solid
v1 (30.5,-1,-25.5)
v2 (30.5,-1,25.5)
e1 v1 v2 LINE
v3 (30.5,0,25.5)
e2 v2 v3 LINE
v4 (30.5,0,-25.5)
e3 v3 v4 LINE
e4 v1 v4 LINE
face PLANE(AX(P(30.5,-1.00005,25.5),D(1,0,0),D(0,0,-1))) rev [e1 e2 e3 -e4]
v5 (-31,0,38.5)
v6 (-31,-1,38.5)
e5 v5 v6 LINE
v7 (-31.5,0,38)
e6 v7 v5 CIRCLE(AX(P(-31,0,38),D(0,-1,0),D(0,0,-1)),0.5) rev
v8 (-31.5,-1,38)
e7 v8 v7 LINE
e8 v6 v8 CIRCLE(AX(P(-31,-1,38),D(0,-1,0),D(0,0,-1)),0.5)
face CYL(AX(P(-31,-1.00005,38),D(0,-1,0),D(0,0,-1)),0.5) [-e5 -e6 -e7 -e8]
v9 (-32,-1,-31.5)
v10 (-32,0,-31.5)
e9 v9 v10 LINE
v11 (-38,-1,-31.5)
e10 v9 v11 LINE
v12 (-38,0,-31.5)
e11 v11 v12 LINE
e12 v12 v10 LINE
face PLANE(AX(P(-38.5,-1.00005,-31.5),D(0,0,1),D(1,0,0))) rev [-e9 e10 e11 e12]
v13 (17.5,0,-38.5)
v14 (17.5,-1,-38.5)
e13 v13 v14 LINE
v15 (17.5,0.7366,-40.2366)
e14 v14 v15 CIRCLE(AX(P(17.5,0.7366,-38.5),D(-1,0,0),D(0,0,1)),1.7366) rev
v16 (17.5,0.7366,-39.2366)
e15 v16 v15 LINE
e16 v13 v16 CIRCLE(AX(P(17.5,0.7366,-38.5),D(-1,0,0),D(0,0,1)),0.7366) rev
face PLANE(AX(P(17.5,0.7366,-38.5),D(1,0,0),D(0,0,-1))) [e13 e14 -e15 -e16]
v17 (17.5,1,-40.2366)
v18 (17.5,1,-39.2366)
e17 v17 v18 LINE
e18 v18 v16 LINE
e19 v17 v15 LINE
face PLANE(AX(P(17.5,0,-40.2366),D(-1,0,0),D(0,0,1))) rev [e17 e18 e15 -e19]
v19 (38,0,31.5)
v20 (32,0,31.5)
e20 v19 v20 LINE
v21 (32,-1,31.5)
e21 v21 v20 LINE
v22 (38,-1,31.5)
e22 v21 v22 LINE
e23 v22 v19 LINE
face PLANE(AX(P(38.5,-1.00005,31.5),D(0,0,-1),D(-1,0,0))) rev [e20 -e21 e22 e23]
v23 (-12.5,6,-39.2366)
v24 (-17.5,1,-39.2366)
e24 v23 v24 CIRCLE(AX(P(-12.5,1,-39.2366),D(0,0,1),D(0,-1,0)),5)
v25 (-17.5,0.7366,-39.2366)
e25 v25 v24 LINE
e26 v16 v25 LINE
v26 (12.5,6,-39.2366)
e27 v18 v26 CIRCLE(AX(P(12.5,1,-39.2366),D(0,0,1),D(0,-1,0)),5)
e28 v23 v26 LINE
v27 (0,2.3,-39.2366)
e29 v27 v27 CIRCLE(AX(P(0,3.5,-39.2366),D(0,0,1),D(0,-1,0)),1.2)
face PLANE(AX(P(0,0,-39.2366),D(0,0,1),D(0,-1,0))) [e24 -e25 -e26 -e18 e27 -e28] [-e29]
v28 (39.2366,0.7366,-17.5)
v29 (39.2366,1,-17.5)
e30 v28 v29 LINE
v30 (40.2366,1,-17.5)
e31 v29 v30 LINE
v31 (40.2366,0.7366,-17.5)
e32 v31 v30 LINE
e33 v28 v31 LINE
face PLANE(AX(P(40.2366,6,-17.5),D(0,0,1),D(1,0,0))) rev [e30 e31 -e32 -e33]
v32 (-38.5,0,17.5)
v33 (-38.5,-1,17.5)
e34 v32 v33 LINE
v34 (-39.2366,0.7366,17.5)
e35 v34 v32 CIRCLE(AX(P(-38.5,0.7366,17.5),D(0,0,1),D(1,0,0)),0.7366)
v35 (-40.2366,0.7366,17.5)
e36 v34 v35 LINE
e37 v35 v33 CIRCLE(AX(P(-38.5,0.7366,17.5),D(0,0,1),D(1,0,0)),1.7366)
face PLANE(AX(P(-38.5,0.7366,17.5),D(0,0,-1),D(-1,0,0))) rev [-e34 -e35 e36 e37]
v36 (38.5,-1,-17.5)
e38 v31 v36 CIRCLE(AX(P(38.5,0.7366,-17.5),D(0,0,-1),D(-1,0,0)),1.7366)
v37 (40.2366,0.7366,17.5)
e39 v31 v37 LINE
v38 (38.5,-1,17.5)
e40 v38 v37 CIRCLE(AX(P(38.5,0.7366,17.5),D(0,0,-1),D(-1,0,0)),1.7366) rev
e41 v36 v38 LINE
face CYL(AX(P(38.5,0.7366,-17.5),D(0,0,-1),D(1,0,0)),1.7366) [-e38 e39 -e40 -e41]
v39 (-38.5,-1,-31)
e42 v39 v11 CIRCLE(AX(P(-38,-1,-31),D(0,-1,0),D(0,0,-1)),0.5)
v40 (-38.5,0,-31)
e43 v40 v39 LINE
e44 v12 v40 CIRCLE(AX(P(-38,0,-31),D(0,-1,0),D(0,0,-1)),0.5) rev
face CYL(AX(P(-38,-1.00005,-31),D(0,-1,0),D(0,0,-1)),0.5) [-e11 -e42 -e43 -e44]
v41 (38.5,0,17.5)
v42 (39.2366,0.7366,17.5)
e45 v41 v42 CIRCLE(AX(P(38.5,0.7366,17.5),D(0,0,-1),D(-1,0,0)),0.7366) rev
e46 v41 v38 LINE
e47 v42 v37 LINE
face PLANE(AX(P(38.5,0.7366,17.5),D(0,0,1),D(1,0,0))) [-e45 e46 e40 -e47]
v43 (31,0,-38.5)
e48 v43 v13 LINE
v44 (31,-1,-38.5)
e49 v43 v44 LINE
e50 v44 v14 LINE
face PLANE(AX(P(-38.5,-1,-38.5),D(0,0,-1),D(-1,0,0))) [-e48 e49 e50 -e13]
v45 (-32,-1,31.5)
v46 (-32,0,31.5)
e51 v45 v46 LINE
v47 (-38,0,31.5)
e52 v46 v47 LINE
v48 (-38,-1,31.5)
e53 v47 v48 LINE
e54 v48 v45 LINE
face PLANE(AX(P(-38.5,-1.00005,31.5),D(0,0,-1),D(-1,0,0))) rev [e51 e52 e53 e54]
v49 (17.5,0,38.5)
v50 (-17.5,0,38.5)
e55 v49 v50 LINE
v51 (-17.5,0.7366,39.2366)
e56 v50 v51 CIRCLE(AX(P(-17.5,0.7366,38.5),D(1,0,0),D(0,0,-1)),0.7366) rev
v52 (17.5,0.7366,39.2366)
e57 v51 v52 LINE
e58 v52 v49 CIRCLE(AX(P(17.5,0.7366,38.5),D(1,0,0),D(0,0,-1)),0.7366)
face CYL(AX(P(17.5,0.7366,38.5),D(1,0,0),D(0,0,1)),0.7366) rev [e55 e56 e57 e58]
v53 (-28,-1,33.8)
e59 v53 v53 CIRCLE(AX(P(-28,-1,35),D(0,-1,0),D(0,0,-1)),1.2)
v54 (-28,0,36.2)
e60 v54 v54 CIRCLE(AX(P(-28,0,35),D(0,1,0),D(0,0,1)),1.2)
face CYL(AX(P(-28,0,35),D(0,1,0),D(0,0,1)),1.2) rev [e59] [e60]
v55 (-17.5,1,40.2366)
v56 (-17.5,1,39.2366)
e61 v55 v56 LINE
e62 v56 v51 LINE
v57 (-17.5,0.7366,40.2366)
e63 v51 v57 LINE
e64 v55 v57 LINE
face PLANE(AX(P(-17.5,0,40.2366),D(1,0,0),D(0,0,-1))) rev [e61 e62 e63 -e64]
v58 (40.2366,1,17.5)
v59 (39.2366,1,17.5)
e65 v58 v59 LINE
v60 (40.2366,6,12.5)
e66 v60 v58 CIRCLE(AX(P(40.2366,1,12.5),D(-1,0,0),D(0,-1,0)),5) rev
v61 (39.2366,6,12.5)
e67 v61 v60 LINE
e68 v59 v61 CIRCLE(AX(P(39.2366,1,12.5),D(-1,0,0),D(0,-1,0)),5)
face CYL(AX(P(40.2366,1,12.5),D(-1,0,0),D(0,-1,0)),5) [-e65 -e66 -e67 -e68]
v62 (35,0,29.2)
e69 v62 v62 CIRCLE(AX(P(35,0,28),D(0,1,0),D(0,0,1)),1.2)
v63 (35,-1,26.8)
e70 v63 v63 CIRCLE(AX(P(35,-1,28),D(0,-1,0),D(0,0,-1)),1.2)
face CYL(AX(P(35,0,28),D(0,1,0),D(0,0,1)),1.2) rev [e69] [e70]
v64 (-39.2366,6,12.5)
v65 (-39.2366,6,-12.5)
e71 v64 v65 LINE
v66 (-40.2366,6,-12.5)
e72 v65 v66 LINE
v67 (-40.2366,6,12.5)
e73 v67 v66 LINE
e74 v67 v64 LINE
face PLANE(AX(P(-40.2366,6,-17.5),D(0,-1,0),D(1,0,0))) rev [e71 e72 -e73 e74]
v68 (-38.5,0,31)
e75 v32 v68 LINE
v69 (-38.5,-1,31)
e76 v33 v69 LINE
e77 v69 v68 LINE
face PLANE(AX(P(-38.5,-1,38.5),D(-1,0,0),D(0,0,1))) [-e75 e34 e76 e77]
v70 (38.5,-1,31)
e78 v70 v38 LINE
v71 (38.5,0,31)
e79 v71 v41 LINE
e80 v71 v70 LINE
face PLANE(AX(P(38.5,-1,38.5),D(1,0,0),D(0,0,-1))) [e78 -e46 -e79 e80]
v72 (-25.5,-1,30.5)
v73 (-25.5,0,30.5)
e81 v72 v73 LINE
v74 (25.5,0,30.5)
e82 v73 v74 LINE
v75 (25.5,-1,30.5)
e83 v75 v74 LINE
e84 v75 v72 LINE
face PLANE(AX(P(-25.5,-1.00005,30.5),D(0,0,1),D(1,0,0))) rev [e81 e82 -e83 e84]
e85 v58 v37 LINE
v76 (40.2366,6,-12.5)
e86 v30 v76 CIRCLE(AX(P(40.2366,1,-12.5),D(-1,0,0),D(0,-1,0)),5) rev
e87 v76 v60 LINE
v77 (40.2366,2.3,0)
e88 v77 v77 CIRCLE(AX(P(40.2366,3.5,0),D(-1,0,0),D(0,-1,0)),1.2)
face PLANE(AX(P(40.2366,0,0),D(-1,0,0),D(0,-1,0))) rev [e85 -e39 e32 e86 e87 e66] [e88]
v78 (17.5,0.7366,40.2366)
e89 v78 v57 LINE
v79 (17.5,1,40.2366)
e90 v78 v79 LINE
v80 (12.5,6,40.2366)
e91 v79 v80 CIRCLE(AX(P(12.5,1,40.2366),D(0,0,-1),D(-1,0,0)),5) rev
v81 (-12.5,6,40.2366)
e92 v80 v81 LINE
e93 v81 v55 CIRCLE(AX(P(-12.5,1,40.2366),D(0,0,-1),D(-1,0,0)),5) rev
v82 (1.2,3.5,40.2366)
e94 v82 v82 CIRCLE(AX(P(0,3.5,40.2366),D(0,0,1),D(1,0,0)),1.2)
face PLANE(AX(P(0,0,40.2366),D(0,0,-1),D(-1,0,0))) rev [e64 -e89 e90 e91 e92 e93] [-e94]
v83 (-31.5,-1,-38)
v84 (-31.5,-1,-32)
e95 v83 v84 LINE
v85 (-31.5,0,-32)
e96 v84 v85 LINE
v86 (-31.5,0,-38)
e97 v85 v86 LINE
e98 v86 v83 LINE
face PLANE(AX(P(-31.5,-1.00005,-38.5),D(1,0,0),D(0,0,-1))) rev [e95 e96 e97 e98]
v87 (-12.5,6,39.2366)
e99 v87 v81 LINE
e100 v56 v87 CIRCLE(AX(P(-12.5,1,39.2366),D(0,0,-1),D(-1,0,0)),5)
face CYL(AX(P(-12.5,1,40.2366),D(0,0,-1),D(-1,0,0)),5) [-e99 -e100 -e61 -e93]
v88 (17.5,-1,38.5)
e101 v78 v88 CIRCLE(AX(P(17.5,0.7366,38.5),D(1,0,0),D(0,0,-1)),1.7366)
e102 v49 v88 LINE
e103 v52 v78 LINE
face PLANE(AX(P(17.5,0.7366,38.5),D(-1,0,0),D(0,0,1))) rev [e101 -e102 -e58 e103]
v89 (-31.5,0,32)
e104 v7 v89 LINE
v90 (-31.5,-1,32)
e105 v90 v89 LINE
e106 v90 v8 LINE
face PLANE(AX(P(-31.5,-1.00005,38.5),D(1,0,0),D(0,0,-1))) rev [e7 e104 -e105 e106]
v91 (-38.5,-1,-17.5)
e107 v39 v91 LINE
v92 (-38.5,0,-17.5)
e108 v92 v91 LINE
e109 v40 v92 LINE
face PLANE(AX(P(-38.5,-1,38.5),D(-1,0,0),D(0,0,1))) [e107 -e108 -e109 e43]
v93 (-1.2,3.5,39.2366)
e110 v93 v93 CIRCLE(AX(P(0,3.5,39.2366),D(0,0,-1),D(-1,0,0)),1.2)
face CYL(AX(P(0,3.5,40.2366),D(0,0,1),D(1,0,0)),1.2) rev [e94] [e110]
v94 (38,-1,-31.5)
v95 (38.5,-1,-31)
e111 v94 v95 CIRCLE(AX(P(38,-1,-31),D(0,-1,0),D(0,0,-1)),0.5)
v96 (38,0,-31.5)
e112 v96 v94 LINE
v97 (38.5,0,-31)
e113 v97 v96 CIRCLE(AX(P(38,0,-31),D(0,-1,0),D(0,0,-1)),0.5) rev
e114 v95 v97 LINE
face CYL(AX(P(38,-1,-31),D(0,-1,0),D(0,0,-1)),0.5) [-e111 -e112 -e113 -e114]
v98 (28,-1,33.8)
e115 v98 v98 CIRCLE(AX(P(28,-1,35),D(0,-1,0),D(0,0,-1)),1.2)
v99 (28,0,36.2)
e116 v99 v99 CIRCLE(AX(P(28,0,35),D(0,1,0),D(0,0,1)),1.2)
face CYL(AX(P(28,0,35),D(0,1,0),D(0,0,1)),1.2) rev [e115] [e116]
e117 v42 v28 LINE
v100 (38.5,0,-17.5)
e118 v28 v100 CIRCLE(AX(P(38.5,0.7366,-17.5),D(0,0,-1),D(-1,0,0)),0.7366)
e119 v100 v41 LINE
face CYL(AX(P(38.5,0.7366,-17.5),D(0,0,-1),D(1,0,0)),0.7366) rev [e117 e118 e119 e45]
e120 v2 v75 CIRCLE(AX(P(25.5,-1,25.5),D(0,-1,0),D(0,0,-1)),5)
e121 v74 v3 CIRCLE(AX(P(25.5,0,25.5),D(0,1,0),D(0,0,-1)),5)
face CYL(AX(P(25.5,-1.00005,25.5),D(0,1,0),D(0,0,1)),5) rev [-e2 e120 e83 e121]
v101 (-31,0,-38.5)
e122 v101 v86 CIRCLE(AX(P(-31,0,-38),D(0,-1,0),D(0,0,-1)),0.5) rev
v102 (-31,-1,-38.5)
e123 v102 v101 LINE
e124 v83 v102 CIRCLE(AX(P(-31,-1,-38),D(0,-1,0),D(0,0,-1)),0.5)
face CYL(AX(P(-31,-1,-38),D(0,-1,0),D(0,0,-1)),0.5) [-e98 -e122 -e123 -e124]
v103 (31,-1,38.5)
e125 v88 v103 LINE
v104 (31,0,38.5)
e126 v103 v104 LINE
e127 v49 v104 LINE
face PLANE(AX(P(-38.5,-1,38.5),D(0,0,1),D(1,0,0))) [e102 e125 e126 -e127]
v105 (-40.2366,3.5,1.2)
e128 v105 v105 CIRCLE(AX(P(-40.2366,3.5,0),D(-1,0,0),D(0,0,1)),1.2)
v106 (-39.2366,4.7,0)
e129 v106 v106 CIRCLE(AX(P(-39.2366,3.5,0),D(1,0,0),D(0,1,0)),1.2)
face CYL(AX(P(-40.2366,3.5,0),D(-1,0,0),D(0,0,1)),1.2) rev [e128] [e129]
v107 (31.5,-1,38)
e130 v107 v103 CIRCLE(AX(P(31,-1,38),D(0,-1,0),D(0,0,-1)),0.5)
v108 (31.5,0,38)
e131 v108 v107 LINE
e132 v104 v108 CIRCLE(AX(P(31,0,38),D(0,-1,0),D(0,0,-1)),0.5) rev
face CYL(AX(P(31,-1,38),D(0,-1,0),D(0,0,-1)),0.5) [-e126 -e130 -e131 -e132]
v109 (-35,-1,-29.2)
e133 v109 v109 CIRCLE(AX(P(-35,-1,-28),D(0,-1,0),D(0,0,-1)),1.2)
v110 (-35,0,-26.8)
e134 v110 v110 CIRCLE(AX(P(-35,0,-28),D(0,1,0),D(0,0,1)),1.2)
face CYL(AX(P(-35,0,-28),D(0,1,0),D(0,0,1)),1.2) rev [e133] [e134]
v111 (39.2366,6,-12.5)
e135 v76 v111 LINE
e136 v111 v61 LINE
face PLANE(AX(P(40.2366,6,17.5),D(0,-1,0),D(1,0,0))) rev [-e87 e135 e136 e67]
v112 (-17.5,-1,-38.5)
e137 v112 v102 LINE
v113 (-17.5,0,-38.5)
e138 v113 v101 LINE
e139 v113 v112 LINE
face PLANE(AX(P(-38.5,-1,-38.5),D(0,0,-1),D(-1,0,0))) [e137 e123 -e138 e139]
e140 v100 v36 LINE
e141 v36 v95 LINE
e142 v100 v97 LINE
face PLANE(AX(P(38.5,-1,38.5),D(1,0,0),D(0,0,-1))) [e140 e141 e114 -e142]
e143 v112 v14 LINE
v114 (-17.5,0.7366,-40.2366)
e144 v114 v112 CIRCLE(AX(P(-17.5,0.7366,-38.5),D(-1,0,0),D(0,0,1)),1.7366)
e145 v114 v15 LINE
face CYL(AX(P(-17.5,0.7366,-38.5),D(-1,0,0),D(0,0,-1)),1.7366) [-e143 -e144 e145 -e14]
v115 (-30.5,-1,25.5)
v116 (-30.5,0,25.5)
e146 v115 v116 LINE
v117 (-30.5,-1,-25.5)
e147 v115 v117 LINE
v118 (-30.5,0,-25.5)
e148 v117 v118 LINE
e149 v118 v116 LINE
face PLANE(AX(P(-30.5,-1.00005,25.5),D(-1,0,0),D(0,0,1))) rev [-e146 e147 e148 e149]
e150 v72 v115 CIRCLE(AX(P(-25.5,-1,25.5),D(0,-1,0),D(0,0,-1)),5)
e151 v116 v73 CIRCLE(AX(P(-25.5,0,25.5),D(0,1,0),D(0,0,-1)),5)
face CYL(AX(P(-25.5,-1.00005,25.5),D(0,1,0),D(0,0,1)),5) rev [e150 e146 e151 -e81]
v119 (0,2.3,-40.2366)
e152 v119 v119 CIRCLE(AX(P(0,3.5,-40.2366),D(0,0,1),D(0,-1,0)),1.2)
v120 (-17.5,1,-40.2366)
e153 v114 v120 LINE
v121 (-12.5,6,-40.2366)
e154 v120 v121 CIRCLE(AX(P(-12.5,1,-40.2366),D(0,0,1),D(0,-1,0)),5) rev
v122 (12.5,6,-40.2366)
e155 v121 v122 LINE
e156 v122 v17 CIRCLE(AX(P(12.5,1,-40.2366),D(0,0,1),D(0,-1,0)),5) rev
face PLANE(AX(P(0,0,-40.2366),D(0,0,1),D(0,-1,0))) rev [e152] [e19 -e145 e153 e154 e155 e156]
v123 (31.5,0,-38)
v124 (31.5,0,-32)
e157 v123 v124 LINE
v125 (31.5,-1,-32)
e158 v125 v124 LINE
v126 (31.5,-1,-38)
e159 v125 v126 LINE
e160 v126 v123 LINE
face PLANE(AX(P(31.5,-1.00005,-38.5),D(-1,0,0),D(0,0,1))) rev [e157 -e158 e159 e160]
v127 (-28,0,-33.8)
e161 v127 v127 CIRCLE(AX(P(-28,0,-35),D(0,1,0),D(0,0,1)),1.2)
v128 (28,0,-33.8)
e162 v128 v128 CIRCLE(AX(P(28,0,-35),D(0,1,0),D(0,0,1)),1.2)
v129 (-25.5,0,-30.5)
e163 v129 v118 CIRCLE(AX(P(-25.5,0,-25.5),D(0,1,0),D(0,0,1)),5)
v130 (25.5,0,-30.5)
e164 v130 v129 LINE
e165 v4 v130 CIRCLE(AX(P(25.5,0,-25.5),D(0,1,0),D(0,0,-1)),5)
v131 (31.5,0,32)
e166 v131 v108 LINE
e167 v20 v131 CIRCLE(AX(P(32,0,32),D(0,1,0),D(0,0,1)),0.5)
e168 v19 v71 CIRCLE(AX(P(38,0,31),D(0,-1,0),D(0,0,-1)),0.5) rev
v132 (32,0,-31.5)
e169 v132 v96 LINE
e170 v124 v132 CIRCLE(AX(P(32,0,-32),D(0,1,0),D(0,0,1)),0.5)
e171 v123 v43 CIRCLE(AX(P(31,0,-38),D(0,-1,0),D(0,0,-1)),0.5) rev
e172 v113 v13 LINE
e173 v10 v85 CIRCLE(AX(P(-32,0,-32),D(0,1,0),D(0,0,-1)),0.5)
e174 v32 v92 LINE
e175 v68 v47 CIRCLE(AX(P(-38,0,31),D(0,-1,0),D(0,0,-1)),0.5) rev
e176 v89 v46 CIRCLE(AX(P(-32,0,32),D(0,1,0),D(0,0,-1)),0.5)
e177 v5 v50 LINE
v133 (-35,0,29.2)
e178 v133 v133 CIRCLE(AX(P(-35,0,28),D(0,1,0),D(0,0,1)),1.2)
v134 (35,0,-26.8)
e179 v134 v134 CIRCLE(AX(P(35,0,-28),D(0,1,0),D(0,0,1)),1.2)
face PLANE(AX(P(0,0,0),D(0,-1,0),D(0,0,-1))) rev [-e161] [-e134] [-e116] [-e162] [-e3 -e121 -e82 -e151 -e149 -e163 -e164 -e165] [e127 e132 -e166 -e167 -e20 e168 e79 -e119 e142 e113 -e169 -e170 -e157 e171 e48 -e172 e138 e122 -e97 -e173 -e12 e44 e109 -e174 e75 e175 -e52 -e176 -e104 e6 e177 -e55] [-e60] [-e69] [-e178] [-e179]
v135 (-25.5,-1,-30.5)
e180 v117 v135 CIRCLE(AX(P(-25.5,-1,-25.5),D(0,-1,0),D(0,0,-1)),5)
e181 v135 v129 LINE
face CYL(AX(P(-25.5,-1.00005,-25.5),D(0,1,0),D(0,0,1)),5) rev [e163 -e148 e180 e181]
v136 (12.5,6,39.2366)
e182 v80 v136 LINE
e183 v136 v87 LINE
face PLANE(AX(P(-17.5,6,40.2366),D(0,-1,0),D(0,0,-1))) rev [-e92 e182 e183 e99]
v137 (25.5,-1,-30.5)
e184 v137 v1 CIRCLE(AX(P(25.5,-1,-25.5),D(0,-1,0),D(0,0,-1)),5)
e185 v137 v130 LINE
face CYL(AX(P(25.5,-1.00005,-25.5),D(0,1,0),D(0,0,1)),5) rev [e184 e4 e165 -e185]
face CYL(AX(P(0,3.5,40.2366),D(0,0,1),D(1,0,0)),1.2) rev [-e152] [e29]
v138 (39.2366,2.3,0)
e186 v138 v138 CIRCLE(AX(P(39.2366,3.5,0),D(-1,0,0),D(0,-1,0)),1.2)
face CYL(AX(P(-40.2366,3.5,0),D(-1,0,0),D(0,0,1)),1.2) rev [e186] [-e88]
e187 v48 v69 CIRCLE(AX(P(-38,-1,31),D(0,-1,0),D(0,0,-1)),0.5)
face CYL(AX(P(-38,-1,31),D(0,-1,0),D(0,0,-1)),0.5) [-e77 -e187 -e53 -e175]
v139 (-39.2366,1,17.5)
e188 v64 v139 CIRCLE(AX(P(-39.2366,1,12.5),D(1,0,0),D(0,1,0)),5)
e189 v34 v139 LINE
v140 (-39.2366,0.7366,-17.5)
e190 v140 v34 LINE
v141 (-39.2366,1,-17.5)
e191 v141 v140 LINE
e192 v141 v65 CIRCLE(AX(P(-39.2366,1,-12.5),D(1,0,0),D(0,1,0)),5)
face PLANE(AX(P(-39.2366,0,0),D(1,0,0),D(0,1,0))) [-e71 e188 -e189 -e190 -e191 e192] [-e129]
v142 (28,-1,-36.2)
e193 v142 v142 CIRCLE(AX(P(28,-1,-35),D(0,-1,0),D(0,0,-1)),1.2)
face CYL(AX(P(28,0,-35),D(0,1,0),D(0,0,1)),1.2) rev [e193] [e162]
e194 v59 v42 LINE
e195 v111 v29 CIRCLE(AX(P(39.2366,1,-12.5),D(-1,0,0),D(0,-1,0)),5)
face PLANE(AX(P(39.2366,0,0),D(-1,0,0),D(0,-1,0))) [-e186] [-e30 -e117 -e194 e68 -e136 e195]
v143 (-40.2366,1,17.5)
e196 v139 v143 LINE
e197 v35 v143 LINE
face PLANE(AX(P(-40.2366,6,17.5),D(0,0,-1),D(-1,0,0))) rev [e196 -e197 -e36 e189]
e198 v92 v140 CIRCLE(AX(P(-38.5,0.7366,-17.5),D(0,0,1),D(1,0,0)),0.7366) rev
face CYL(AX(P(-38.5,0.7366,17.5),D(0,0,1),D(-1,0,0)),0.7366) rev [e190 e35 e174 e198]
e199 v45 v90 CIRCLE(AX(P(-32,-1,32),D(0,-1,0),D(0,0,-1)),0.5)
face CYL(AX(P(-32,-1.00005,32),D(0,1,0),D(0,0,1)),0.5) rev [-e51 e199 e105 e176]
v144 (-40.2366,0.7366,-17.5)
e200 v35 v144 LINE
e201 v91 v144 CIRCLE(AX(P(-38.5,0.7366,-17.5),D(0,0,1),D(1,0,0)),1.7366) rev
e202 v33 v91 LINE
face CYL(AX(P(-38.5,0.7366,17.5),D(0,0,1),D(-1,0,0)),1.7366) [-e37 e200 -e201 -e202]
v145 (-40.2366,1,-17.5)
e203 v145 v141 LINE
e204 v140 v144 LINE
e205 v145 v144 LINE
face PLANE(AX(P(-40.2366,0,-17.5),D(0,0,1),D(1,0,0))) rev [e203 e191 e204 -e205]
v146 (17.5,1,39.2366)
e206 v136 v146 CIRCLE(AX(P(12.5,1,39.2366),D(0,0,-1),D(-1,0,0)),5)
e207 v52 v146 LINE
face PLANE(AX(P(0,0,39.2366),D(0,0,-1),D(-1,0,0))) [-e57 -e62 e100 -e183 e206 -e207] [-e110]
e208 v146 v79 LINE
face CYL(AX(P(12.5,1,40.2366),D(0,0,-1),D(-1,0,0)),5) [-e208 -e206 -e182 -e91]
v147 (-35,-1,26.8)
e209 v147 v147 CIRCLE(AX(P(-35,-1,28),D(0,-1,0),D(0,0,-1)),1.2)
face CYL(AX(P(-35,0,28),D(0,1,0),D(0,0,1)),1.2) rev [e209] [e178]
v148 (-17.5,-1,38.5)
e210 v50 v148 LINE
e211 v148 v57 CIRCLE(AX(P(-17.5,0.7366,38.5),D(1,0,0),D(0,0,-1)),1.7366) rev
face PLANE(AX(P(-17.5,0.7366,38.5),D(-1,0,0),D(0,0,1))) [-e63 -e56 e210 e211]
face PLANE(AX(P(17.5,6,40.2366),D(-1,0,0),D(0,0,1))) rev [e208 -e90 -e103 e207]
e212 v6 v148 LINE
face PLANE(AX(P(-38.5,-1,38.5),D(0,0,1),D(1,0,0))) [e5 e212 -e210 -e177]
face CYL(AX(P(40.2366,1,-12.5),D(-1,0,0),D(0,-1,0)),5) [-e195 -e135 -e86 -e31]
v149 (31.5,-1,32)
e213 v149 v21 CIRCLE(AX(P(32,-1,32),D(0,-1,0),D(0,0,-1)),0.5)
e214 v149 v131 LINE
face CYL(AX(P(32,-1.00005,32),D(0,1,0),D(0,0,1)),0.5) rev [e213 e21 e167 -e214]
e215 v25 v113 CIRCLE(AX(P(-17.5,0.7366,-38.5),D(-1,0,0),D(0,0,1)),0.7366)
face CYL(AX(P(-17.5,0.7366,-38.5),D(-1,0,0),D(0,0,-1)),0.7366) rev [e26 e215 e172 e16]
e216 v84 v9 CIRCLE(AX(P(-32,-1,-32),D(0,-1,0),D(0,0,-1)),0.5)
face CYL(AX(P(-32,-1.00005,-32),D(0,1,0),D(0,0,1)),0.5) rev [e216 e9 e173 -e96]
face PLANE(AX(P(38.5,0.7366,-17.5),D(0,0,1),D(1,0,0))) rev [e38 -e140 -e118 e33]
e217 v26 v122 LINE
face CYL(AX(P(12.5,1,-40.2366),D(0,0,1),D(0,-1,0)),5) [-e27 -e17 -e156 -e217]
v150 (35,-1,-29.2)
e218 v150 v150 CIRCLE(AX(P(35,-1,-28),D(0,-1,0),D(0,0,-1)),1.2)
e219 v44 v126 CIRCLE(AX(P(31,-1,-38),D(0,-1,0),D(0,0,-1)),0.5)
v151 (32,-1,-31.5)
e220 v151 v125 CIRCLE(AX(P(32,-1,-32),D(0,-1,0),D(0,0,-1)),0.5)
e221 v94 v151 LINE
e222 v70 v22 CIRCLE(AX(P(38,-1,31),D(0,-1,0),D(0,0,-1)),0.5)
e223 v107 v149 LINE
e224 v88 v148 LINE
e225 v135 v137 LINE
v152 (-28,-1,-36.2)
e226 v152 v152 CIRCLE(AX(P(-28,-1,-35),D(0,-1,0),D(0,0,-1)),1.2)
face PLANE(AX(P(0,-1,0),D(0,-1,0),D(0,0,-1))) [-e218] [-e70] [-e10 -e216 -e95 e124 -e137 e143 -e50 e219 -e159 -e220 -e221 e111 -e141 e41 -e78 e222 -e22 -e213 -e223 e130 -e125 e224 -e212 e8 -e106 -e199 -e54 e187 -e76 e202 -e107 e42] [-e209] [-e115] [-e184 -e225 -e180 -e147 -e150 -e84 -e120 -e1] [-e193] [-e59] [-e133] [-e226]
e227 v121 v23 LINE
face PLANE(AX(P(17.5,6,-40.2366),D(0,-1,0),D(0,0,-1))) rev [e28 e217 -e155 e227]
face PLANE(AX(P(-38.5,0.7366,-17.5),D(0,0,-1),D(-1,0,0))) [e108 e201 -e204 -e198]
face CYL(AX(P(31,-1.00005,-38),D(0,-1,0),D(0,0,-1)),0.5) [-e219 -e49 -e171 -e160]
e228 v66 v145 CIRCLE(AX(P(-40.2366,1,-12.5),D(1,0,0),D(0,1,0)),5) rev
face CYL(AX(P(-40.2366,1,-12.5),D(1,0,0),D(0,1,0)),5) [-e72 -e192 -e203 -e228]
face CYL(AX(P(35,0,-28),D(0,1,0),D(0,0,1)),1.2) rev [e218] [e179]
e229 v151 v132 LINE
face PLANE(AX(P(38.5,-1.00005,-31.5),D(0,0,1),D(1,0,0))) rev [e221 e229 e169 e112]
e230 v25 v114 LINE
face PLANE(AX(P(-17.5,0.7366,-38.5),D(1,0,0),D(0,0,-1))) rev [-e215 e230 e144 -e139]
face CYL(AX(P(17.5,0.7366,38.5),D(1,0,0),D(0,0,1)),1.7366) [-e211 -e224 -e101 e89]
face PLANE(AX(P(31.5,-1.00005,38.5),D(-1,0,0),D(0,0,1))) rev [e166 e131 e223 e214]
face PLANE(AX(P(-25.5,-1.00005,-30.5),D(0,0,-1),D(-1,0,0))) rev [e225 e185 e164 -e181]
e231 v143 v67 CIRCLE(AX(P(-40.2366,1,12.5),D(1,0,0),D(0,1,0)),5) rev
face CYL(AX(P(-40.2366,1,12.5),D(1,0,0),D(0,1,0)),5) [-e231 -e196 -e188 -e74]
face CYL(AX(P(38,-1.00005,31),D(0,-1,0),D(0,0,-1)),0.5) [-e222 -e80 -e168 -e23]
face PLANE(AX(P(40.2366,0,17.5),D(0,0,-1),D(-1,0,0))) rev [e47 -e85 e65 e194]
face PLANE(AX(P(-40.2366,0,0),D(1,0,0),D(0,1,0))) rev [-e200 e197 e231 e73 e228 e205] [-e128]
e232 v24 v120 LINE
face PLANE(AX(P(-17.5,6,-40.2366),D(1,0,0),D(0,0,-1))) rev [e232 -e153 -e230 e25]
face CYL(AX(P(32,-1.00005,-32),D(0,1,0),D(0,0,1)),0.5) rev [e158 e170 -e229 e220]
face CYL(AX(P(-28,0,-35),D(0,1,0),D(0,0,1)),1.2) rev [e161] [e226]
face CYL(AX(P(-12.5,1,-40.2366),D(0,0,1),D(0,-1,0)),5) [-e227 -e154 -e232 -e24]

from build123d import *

# Parameters (mm, degrees)
SKETCH1_W          = 77
SKETCH1_H          = 77
BASE_FLANGE1_DEPTH = 1
EDGE_FLANGE1_DEPTH = 35
EDGE_FLANGE2_DEPTH = 35
EDGE_FLANGE3_DEPTH = 35
EDGE_FLANGE4_DEPTH = 35
CUT_EXTRUDE1_DEPTH = 58.218598018
FILLET1_R          = 0.5
FILLET2_R          = 5
M2_HOLE1_AA_D      = 2.4
M2_HOLE2_AB_D      = 2.4
M2_HOLE3_AC_D      = 2.4


# Sheet-metal steps are written as plain solids
with BuildPart() as part:
    # Sketch1 → Base-Flange1 (new body)
    with BuildSketch(Plane(origin=(0, 0, 0), x_dir=(1, 0, 0), z_dir=(0, 1, 0))):
        Rectangle(SKETCH1_W, SKETCH1_H)
    extrude(amount=-BASE_FLANGE1_DEPTH)

    # Edge-Flange1 section (across the edge) → Edge-Flange1 (add)
    with BuildSketch(Plane(origin=(-17.5, 0, 39.2366), x_dir=(0, 0, -1), z_dir=(1, 0, 0))):
        with BuildLine():
            Line((-1, 0.7366), (-1, 6))
            Line((-1, 6), (0, 6))
            Line((0, 6), (0, 0.7366))
            ThreePointArc((0, 0.7366), (0.215745145, 0.215745145), (0.7366, 0))
            Line((0.7366, 0), (0.7366, -1))
            ThreePointArc((0.7366, -1), (-0.491361636, -0.491361636), (-1, 0.7366))
        make_face()
    extrude(amount=EDGE_FLANGE1_DEPTH)

    # Edge-Flange2 section (across the edge) → Edge-Flange2 (add)
    with BuildSketch(Plane(origin=(17.5, 0, -39.2366), x_dir=(0, 0, 1), z_dir=(-1, 0, 0))):
        with BuildLine():
            Line((-1, 0.7366), (-1, 6))
            Line((-1, 6), (0, 6))
            Line((0, 6), (0, 0.7366))
            ThreePointArc((0, 0.7366), (0.215745145, 0.215745145), (0.7366, 0))
            Line((0.7366, 0), (0.7366, -1))
            ThreePointArc((0.7366, -1), (-0.491361636, -0.491361636), (-1, 0.7366))
        make_face()
    extrude(amount=EDGE_FLANGE2_DEPTH)

    # Edge-Flange3 section (across the edge) → Edge-Flange3 (add)
    with BuildSketch(Plane(origin=(-39.2366, 0, -17.5), x_dir=(1, 0, 0), z_dir=(0, 0, 1))):
        with BuildLine():
            Line((-1, 0.7366), (-1, 6))
            Line((-1, 6), (0, 6))
            Line((0, 6), (0, 0.7366))
            ThreePointArc((0, 0.7366), (0.215745145, 0.215745145), (0.7366, 0))
            Line((0.7366, 0), (0.7366, -1))
            ThreePointArc((0.7366, -1), (-0.491361636, -0.491361636), (-1, 0.7366))
        make_face()
    extrude(amount=EDGE_FLANGE3_DEPTH)

    # Edge-Flange4 section (across the edge) → Edge-Flange4 (add)
    with BuildSketch(Plane(origin=(39.2366, 0, 17.5), x_dir=(-1, 0, 0), z_dir=(0, 0, -1))):
        with BuildLine():
            Line((-1, 0.7366), (-1, 6))
            Line((-1, 6), (0, 6))
            Line((0, 6), (0, 0.7366))
            ThreePointArc((0, 0.7366), (0.215745145, 0.215745145), (0.7366, 0))
            Line((0.7366, 0), (0.7366, -1))
            ThreePointArc((0.7366, -1), (-0.491361636, -0.491361636), (-1, 0.7366))
        make_face()
    extrude(amount=EDGE_FLANGE4_DEPTH)

    # Sketch18 → Cut-Extrude1 (cut, through all)
    with BuildSketch(Plane(origin=(0, 0, 0), x_dir=(1, 0, 0), z_dir=(0, 1, 0))):
        with BuildLine():
            Line((-25.5, -30.5), (25.5, -30.5))
            ThreePointArc((25.5, -30.5), (29.035533906, -29.035533906), (30.5, -25.5))
            Line((30.5, -25.5), (30.5, 25.5))
            ThreePointArc((30.5, 25.5), (29.035533906, 29.035533906), (25.5, 30.5))
            Line((25.5, 30.5), (-25.5, 30.5))
            ThreePointArc((-25.5, 30.5), (-29.035533906, 29.035533906), (-30.5, 25.5))
            Line((-30.5, 25.5), (-30.5, -25.5))
            ThreePointArc((-30.5, -25.5), (-29.035533906, -29.035533906), (-25.5, -30.5))
        make_face()
        with BuildLine():
            Line((-38.5, 38.5), (-31.5, 38.5))
            Line((-31.5, 38.5), (-31.5, 32))
            ThreePointArc((-31.5, 32), (-31.646446609, 31.646446609), (-32, 31.5))
            Line((-32, 31.5), (-38.5, 31.5))
            Line((-38.5, 31.5), (-38.5, 38.5))
        make_face()
        with BuildLine():
            Line((38.5, 38.5), (31.5, 38.5))
            Line((31.5, 38.5), (31.5, 32))
            ThreePointArc((31.5, 32), (31.646446609, 31.646446609), (32, 31.5))
            Line((32, 31.5), (38.5, 31.5))
            Line((38.5, 31.5), (38.5, 38.5))
        make_face()
        with BuildLine():
            Line((38.5, -38.5), (31.5, -38.5))
            Line((31.5, -38.5), (31.5, -32))
            ThreePointArc((31.5, -32), (31.646446609, -31.646446609), (32, -31.5))
            Line((32, -31.5), (38.5, -31.5))
            Line((38.5, -31.5), (38.5, -38.5))
        make_face()
        with BuildLine():
            Line((-38.5, -38.5), (-31.5, -38.5))
            Line((-31.5, -38.5), (-31.5, -32))
            ThreePointArc((-31.5, -32), (-31.646446609, -31.646446609), (-32, -31.5))
            Line((-32, -31.5), (-38.5, -31.5))
            Line((-38.5, -31.5), (-38.5, -38.5))
        make_face()
    extrude(amount=-CUT_EXTRUDE1_DEPTH, mode=Mode.SUBTRACT)

    # Fillet1
    fillet1_edges = [part.edges().sort_by_distance(p)[0] for p in [
        (31.5, -0.5, -38.5),
        (38.5, -0.5, -31.5),
        (38.5, -0.5, 31.5),
        (31.5, -0.5, 38.5),
        (-31.5, -0.5, 38.5),
        (-38.5, -0.5, 31.5),
        (-38.5, -0.5, -31.5),
        (-31.5, -0.5, -38.5),
    ]]
    fillet(fillet1_edges, radius=FILLET1_R)

    # Fillet2
    fillet2_edges = [part.edges().sort_by_distance(p)[0] for p in [
        (39.7366, 6, 17.5),
        (39.7366, 6, -17.5),
        (-17.5, 6, 39.7366),
        (17.5, 6, 39.7366),
        (17.5, 6, -39.7366),
        (-17.5, 6, -39.7366),
        (-39.7366, 6, -17.5),
        (-39.7366, 6, 17.5),
    ]]
    fillet(fillet2_edges, radius=FILLET2_R)

    # M2 Hole1 - AA (through all)
    with Locations(Plane(origin=(-35, 0, -28), x_dir=(0, 0, 1), z_dir=(0, 1, 0))):
        with Locations((0, 0), (-7, 7), (-7, 63), (0, 70), (56, 0), (63, 7), (63, 63), (56, 70)):
            Hole(M2_HOLE1_AA_D / 2)

    # M2 Hole2 - AB (through all)
    with Locations(Plane.ZY.offset(40.2366)):
        with Locations((0, 3.5)):
            Hole(M2_HOLE2_AB_D / 2)

    # M2 Hole3 - AC (through all)
    with Locations(Plane.XY.offset(40.2366)):
        with Locations((0, 3.5)):
            Hole(M2_HOLE3_AC_D / 2)


solid = part.part
